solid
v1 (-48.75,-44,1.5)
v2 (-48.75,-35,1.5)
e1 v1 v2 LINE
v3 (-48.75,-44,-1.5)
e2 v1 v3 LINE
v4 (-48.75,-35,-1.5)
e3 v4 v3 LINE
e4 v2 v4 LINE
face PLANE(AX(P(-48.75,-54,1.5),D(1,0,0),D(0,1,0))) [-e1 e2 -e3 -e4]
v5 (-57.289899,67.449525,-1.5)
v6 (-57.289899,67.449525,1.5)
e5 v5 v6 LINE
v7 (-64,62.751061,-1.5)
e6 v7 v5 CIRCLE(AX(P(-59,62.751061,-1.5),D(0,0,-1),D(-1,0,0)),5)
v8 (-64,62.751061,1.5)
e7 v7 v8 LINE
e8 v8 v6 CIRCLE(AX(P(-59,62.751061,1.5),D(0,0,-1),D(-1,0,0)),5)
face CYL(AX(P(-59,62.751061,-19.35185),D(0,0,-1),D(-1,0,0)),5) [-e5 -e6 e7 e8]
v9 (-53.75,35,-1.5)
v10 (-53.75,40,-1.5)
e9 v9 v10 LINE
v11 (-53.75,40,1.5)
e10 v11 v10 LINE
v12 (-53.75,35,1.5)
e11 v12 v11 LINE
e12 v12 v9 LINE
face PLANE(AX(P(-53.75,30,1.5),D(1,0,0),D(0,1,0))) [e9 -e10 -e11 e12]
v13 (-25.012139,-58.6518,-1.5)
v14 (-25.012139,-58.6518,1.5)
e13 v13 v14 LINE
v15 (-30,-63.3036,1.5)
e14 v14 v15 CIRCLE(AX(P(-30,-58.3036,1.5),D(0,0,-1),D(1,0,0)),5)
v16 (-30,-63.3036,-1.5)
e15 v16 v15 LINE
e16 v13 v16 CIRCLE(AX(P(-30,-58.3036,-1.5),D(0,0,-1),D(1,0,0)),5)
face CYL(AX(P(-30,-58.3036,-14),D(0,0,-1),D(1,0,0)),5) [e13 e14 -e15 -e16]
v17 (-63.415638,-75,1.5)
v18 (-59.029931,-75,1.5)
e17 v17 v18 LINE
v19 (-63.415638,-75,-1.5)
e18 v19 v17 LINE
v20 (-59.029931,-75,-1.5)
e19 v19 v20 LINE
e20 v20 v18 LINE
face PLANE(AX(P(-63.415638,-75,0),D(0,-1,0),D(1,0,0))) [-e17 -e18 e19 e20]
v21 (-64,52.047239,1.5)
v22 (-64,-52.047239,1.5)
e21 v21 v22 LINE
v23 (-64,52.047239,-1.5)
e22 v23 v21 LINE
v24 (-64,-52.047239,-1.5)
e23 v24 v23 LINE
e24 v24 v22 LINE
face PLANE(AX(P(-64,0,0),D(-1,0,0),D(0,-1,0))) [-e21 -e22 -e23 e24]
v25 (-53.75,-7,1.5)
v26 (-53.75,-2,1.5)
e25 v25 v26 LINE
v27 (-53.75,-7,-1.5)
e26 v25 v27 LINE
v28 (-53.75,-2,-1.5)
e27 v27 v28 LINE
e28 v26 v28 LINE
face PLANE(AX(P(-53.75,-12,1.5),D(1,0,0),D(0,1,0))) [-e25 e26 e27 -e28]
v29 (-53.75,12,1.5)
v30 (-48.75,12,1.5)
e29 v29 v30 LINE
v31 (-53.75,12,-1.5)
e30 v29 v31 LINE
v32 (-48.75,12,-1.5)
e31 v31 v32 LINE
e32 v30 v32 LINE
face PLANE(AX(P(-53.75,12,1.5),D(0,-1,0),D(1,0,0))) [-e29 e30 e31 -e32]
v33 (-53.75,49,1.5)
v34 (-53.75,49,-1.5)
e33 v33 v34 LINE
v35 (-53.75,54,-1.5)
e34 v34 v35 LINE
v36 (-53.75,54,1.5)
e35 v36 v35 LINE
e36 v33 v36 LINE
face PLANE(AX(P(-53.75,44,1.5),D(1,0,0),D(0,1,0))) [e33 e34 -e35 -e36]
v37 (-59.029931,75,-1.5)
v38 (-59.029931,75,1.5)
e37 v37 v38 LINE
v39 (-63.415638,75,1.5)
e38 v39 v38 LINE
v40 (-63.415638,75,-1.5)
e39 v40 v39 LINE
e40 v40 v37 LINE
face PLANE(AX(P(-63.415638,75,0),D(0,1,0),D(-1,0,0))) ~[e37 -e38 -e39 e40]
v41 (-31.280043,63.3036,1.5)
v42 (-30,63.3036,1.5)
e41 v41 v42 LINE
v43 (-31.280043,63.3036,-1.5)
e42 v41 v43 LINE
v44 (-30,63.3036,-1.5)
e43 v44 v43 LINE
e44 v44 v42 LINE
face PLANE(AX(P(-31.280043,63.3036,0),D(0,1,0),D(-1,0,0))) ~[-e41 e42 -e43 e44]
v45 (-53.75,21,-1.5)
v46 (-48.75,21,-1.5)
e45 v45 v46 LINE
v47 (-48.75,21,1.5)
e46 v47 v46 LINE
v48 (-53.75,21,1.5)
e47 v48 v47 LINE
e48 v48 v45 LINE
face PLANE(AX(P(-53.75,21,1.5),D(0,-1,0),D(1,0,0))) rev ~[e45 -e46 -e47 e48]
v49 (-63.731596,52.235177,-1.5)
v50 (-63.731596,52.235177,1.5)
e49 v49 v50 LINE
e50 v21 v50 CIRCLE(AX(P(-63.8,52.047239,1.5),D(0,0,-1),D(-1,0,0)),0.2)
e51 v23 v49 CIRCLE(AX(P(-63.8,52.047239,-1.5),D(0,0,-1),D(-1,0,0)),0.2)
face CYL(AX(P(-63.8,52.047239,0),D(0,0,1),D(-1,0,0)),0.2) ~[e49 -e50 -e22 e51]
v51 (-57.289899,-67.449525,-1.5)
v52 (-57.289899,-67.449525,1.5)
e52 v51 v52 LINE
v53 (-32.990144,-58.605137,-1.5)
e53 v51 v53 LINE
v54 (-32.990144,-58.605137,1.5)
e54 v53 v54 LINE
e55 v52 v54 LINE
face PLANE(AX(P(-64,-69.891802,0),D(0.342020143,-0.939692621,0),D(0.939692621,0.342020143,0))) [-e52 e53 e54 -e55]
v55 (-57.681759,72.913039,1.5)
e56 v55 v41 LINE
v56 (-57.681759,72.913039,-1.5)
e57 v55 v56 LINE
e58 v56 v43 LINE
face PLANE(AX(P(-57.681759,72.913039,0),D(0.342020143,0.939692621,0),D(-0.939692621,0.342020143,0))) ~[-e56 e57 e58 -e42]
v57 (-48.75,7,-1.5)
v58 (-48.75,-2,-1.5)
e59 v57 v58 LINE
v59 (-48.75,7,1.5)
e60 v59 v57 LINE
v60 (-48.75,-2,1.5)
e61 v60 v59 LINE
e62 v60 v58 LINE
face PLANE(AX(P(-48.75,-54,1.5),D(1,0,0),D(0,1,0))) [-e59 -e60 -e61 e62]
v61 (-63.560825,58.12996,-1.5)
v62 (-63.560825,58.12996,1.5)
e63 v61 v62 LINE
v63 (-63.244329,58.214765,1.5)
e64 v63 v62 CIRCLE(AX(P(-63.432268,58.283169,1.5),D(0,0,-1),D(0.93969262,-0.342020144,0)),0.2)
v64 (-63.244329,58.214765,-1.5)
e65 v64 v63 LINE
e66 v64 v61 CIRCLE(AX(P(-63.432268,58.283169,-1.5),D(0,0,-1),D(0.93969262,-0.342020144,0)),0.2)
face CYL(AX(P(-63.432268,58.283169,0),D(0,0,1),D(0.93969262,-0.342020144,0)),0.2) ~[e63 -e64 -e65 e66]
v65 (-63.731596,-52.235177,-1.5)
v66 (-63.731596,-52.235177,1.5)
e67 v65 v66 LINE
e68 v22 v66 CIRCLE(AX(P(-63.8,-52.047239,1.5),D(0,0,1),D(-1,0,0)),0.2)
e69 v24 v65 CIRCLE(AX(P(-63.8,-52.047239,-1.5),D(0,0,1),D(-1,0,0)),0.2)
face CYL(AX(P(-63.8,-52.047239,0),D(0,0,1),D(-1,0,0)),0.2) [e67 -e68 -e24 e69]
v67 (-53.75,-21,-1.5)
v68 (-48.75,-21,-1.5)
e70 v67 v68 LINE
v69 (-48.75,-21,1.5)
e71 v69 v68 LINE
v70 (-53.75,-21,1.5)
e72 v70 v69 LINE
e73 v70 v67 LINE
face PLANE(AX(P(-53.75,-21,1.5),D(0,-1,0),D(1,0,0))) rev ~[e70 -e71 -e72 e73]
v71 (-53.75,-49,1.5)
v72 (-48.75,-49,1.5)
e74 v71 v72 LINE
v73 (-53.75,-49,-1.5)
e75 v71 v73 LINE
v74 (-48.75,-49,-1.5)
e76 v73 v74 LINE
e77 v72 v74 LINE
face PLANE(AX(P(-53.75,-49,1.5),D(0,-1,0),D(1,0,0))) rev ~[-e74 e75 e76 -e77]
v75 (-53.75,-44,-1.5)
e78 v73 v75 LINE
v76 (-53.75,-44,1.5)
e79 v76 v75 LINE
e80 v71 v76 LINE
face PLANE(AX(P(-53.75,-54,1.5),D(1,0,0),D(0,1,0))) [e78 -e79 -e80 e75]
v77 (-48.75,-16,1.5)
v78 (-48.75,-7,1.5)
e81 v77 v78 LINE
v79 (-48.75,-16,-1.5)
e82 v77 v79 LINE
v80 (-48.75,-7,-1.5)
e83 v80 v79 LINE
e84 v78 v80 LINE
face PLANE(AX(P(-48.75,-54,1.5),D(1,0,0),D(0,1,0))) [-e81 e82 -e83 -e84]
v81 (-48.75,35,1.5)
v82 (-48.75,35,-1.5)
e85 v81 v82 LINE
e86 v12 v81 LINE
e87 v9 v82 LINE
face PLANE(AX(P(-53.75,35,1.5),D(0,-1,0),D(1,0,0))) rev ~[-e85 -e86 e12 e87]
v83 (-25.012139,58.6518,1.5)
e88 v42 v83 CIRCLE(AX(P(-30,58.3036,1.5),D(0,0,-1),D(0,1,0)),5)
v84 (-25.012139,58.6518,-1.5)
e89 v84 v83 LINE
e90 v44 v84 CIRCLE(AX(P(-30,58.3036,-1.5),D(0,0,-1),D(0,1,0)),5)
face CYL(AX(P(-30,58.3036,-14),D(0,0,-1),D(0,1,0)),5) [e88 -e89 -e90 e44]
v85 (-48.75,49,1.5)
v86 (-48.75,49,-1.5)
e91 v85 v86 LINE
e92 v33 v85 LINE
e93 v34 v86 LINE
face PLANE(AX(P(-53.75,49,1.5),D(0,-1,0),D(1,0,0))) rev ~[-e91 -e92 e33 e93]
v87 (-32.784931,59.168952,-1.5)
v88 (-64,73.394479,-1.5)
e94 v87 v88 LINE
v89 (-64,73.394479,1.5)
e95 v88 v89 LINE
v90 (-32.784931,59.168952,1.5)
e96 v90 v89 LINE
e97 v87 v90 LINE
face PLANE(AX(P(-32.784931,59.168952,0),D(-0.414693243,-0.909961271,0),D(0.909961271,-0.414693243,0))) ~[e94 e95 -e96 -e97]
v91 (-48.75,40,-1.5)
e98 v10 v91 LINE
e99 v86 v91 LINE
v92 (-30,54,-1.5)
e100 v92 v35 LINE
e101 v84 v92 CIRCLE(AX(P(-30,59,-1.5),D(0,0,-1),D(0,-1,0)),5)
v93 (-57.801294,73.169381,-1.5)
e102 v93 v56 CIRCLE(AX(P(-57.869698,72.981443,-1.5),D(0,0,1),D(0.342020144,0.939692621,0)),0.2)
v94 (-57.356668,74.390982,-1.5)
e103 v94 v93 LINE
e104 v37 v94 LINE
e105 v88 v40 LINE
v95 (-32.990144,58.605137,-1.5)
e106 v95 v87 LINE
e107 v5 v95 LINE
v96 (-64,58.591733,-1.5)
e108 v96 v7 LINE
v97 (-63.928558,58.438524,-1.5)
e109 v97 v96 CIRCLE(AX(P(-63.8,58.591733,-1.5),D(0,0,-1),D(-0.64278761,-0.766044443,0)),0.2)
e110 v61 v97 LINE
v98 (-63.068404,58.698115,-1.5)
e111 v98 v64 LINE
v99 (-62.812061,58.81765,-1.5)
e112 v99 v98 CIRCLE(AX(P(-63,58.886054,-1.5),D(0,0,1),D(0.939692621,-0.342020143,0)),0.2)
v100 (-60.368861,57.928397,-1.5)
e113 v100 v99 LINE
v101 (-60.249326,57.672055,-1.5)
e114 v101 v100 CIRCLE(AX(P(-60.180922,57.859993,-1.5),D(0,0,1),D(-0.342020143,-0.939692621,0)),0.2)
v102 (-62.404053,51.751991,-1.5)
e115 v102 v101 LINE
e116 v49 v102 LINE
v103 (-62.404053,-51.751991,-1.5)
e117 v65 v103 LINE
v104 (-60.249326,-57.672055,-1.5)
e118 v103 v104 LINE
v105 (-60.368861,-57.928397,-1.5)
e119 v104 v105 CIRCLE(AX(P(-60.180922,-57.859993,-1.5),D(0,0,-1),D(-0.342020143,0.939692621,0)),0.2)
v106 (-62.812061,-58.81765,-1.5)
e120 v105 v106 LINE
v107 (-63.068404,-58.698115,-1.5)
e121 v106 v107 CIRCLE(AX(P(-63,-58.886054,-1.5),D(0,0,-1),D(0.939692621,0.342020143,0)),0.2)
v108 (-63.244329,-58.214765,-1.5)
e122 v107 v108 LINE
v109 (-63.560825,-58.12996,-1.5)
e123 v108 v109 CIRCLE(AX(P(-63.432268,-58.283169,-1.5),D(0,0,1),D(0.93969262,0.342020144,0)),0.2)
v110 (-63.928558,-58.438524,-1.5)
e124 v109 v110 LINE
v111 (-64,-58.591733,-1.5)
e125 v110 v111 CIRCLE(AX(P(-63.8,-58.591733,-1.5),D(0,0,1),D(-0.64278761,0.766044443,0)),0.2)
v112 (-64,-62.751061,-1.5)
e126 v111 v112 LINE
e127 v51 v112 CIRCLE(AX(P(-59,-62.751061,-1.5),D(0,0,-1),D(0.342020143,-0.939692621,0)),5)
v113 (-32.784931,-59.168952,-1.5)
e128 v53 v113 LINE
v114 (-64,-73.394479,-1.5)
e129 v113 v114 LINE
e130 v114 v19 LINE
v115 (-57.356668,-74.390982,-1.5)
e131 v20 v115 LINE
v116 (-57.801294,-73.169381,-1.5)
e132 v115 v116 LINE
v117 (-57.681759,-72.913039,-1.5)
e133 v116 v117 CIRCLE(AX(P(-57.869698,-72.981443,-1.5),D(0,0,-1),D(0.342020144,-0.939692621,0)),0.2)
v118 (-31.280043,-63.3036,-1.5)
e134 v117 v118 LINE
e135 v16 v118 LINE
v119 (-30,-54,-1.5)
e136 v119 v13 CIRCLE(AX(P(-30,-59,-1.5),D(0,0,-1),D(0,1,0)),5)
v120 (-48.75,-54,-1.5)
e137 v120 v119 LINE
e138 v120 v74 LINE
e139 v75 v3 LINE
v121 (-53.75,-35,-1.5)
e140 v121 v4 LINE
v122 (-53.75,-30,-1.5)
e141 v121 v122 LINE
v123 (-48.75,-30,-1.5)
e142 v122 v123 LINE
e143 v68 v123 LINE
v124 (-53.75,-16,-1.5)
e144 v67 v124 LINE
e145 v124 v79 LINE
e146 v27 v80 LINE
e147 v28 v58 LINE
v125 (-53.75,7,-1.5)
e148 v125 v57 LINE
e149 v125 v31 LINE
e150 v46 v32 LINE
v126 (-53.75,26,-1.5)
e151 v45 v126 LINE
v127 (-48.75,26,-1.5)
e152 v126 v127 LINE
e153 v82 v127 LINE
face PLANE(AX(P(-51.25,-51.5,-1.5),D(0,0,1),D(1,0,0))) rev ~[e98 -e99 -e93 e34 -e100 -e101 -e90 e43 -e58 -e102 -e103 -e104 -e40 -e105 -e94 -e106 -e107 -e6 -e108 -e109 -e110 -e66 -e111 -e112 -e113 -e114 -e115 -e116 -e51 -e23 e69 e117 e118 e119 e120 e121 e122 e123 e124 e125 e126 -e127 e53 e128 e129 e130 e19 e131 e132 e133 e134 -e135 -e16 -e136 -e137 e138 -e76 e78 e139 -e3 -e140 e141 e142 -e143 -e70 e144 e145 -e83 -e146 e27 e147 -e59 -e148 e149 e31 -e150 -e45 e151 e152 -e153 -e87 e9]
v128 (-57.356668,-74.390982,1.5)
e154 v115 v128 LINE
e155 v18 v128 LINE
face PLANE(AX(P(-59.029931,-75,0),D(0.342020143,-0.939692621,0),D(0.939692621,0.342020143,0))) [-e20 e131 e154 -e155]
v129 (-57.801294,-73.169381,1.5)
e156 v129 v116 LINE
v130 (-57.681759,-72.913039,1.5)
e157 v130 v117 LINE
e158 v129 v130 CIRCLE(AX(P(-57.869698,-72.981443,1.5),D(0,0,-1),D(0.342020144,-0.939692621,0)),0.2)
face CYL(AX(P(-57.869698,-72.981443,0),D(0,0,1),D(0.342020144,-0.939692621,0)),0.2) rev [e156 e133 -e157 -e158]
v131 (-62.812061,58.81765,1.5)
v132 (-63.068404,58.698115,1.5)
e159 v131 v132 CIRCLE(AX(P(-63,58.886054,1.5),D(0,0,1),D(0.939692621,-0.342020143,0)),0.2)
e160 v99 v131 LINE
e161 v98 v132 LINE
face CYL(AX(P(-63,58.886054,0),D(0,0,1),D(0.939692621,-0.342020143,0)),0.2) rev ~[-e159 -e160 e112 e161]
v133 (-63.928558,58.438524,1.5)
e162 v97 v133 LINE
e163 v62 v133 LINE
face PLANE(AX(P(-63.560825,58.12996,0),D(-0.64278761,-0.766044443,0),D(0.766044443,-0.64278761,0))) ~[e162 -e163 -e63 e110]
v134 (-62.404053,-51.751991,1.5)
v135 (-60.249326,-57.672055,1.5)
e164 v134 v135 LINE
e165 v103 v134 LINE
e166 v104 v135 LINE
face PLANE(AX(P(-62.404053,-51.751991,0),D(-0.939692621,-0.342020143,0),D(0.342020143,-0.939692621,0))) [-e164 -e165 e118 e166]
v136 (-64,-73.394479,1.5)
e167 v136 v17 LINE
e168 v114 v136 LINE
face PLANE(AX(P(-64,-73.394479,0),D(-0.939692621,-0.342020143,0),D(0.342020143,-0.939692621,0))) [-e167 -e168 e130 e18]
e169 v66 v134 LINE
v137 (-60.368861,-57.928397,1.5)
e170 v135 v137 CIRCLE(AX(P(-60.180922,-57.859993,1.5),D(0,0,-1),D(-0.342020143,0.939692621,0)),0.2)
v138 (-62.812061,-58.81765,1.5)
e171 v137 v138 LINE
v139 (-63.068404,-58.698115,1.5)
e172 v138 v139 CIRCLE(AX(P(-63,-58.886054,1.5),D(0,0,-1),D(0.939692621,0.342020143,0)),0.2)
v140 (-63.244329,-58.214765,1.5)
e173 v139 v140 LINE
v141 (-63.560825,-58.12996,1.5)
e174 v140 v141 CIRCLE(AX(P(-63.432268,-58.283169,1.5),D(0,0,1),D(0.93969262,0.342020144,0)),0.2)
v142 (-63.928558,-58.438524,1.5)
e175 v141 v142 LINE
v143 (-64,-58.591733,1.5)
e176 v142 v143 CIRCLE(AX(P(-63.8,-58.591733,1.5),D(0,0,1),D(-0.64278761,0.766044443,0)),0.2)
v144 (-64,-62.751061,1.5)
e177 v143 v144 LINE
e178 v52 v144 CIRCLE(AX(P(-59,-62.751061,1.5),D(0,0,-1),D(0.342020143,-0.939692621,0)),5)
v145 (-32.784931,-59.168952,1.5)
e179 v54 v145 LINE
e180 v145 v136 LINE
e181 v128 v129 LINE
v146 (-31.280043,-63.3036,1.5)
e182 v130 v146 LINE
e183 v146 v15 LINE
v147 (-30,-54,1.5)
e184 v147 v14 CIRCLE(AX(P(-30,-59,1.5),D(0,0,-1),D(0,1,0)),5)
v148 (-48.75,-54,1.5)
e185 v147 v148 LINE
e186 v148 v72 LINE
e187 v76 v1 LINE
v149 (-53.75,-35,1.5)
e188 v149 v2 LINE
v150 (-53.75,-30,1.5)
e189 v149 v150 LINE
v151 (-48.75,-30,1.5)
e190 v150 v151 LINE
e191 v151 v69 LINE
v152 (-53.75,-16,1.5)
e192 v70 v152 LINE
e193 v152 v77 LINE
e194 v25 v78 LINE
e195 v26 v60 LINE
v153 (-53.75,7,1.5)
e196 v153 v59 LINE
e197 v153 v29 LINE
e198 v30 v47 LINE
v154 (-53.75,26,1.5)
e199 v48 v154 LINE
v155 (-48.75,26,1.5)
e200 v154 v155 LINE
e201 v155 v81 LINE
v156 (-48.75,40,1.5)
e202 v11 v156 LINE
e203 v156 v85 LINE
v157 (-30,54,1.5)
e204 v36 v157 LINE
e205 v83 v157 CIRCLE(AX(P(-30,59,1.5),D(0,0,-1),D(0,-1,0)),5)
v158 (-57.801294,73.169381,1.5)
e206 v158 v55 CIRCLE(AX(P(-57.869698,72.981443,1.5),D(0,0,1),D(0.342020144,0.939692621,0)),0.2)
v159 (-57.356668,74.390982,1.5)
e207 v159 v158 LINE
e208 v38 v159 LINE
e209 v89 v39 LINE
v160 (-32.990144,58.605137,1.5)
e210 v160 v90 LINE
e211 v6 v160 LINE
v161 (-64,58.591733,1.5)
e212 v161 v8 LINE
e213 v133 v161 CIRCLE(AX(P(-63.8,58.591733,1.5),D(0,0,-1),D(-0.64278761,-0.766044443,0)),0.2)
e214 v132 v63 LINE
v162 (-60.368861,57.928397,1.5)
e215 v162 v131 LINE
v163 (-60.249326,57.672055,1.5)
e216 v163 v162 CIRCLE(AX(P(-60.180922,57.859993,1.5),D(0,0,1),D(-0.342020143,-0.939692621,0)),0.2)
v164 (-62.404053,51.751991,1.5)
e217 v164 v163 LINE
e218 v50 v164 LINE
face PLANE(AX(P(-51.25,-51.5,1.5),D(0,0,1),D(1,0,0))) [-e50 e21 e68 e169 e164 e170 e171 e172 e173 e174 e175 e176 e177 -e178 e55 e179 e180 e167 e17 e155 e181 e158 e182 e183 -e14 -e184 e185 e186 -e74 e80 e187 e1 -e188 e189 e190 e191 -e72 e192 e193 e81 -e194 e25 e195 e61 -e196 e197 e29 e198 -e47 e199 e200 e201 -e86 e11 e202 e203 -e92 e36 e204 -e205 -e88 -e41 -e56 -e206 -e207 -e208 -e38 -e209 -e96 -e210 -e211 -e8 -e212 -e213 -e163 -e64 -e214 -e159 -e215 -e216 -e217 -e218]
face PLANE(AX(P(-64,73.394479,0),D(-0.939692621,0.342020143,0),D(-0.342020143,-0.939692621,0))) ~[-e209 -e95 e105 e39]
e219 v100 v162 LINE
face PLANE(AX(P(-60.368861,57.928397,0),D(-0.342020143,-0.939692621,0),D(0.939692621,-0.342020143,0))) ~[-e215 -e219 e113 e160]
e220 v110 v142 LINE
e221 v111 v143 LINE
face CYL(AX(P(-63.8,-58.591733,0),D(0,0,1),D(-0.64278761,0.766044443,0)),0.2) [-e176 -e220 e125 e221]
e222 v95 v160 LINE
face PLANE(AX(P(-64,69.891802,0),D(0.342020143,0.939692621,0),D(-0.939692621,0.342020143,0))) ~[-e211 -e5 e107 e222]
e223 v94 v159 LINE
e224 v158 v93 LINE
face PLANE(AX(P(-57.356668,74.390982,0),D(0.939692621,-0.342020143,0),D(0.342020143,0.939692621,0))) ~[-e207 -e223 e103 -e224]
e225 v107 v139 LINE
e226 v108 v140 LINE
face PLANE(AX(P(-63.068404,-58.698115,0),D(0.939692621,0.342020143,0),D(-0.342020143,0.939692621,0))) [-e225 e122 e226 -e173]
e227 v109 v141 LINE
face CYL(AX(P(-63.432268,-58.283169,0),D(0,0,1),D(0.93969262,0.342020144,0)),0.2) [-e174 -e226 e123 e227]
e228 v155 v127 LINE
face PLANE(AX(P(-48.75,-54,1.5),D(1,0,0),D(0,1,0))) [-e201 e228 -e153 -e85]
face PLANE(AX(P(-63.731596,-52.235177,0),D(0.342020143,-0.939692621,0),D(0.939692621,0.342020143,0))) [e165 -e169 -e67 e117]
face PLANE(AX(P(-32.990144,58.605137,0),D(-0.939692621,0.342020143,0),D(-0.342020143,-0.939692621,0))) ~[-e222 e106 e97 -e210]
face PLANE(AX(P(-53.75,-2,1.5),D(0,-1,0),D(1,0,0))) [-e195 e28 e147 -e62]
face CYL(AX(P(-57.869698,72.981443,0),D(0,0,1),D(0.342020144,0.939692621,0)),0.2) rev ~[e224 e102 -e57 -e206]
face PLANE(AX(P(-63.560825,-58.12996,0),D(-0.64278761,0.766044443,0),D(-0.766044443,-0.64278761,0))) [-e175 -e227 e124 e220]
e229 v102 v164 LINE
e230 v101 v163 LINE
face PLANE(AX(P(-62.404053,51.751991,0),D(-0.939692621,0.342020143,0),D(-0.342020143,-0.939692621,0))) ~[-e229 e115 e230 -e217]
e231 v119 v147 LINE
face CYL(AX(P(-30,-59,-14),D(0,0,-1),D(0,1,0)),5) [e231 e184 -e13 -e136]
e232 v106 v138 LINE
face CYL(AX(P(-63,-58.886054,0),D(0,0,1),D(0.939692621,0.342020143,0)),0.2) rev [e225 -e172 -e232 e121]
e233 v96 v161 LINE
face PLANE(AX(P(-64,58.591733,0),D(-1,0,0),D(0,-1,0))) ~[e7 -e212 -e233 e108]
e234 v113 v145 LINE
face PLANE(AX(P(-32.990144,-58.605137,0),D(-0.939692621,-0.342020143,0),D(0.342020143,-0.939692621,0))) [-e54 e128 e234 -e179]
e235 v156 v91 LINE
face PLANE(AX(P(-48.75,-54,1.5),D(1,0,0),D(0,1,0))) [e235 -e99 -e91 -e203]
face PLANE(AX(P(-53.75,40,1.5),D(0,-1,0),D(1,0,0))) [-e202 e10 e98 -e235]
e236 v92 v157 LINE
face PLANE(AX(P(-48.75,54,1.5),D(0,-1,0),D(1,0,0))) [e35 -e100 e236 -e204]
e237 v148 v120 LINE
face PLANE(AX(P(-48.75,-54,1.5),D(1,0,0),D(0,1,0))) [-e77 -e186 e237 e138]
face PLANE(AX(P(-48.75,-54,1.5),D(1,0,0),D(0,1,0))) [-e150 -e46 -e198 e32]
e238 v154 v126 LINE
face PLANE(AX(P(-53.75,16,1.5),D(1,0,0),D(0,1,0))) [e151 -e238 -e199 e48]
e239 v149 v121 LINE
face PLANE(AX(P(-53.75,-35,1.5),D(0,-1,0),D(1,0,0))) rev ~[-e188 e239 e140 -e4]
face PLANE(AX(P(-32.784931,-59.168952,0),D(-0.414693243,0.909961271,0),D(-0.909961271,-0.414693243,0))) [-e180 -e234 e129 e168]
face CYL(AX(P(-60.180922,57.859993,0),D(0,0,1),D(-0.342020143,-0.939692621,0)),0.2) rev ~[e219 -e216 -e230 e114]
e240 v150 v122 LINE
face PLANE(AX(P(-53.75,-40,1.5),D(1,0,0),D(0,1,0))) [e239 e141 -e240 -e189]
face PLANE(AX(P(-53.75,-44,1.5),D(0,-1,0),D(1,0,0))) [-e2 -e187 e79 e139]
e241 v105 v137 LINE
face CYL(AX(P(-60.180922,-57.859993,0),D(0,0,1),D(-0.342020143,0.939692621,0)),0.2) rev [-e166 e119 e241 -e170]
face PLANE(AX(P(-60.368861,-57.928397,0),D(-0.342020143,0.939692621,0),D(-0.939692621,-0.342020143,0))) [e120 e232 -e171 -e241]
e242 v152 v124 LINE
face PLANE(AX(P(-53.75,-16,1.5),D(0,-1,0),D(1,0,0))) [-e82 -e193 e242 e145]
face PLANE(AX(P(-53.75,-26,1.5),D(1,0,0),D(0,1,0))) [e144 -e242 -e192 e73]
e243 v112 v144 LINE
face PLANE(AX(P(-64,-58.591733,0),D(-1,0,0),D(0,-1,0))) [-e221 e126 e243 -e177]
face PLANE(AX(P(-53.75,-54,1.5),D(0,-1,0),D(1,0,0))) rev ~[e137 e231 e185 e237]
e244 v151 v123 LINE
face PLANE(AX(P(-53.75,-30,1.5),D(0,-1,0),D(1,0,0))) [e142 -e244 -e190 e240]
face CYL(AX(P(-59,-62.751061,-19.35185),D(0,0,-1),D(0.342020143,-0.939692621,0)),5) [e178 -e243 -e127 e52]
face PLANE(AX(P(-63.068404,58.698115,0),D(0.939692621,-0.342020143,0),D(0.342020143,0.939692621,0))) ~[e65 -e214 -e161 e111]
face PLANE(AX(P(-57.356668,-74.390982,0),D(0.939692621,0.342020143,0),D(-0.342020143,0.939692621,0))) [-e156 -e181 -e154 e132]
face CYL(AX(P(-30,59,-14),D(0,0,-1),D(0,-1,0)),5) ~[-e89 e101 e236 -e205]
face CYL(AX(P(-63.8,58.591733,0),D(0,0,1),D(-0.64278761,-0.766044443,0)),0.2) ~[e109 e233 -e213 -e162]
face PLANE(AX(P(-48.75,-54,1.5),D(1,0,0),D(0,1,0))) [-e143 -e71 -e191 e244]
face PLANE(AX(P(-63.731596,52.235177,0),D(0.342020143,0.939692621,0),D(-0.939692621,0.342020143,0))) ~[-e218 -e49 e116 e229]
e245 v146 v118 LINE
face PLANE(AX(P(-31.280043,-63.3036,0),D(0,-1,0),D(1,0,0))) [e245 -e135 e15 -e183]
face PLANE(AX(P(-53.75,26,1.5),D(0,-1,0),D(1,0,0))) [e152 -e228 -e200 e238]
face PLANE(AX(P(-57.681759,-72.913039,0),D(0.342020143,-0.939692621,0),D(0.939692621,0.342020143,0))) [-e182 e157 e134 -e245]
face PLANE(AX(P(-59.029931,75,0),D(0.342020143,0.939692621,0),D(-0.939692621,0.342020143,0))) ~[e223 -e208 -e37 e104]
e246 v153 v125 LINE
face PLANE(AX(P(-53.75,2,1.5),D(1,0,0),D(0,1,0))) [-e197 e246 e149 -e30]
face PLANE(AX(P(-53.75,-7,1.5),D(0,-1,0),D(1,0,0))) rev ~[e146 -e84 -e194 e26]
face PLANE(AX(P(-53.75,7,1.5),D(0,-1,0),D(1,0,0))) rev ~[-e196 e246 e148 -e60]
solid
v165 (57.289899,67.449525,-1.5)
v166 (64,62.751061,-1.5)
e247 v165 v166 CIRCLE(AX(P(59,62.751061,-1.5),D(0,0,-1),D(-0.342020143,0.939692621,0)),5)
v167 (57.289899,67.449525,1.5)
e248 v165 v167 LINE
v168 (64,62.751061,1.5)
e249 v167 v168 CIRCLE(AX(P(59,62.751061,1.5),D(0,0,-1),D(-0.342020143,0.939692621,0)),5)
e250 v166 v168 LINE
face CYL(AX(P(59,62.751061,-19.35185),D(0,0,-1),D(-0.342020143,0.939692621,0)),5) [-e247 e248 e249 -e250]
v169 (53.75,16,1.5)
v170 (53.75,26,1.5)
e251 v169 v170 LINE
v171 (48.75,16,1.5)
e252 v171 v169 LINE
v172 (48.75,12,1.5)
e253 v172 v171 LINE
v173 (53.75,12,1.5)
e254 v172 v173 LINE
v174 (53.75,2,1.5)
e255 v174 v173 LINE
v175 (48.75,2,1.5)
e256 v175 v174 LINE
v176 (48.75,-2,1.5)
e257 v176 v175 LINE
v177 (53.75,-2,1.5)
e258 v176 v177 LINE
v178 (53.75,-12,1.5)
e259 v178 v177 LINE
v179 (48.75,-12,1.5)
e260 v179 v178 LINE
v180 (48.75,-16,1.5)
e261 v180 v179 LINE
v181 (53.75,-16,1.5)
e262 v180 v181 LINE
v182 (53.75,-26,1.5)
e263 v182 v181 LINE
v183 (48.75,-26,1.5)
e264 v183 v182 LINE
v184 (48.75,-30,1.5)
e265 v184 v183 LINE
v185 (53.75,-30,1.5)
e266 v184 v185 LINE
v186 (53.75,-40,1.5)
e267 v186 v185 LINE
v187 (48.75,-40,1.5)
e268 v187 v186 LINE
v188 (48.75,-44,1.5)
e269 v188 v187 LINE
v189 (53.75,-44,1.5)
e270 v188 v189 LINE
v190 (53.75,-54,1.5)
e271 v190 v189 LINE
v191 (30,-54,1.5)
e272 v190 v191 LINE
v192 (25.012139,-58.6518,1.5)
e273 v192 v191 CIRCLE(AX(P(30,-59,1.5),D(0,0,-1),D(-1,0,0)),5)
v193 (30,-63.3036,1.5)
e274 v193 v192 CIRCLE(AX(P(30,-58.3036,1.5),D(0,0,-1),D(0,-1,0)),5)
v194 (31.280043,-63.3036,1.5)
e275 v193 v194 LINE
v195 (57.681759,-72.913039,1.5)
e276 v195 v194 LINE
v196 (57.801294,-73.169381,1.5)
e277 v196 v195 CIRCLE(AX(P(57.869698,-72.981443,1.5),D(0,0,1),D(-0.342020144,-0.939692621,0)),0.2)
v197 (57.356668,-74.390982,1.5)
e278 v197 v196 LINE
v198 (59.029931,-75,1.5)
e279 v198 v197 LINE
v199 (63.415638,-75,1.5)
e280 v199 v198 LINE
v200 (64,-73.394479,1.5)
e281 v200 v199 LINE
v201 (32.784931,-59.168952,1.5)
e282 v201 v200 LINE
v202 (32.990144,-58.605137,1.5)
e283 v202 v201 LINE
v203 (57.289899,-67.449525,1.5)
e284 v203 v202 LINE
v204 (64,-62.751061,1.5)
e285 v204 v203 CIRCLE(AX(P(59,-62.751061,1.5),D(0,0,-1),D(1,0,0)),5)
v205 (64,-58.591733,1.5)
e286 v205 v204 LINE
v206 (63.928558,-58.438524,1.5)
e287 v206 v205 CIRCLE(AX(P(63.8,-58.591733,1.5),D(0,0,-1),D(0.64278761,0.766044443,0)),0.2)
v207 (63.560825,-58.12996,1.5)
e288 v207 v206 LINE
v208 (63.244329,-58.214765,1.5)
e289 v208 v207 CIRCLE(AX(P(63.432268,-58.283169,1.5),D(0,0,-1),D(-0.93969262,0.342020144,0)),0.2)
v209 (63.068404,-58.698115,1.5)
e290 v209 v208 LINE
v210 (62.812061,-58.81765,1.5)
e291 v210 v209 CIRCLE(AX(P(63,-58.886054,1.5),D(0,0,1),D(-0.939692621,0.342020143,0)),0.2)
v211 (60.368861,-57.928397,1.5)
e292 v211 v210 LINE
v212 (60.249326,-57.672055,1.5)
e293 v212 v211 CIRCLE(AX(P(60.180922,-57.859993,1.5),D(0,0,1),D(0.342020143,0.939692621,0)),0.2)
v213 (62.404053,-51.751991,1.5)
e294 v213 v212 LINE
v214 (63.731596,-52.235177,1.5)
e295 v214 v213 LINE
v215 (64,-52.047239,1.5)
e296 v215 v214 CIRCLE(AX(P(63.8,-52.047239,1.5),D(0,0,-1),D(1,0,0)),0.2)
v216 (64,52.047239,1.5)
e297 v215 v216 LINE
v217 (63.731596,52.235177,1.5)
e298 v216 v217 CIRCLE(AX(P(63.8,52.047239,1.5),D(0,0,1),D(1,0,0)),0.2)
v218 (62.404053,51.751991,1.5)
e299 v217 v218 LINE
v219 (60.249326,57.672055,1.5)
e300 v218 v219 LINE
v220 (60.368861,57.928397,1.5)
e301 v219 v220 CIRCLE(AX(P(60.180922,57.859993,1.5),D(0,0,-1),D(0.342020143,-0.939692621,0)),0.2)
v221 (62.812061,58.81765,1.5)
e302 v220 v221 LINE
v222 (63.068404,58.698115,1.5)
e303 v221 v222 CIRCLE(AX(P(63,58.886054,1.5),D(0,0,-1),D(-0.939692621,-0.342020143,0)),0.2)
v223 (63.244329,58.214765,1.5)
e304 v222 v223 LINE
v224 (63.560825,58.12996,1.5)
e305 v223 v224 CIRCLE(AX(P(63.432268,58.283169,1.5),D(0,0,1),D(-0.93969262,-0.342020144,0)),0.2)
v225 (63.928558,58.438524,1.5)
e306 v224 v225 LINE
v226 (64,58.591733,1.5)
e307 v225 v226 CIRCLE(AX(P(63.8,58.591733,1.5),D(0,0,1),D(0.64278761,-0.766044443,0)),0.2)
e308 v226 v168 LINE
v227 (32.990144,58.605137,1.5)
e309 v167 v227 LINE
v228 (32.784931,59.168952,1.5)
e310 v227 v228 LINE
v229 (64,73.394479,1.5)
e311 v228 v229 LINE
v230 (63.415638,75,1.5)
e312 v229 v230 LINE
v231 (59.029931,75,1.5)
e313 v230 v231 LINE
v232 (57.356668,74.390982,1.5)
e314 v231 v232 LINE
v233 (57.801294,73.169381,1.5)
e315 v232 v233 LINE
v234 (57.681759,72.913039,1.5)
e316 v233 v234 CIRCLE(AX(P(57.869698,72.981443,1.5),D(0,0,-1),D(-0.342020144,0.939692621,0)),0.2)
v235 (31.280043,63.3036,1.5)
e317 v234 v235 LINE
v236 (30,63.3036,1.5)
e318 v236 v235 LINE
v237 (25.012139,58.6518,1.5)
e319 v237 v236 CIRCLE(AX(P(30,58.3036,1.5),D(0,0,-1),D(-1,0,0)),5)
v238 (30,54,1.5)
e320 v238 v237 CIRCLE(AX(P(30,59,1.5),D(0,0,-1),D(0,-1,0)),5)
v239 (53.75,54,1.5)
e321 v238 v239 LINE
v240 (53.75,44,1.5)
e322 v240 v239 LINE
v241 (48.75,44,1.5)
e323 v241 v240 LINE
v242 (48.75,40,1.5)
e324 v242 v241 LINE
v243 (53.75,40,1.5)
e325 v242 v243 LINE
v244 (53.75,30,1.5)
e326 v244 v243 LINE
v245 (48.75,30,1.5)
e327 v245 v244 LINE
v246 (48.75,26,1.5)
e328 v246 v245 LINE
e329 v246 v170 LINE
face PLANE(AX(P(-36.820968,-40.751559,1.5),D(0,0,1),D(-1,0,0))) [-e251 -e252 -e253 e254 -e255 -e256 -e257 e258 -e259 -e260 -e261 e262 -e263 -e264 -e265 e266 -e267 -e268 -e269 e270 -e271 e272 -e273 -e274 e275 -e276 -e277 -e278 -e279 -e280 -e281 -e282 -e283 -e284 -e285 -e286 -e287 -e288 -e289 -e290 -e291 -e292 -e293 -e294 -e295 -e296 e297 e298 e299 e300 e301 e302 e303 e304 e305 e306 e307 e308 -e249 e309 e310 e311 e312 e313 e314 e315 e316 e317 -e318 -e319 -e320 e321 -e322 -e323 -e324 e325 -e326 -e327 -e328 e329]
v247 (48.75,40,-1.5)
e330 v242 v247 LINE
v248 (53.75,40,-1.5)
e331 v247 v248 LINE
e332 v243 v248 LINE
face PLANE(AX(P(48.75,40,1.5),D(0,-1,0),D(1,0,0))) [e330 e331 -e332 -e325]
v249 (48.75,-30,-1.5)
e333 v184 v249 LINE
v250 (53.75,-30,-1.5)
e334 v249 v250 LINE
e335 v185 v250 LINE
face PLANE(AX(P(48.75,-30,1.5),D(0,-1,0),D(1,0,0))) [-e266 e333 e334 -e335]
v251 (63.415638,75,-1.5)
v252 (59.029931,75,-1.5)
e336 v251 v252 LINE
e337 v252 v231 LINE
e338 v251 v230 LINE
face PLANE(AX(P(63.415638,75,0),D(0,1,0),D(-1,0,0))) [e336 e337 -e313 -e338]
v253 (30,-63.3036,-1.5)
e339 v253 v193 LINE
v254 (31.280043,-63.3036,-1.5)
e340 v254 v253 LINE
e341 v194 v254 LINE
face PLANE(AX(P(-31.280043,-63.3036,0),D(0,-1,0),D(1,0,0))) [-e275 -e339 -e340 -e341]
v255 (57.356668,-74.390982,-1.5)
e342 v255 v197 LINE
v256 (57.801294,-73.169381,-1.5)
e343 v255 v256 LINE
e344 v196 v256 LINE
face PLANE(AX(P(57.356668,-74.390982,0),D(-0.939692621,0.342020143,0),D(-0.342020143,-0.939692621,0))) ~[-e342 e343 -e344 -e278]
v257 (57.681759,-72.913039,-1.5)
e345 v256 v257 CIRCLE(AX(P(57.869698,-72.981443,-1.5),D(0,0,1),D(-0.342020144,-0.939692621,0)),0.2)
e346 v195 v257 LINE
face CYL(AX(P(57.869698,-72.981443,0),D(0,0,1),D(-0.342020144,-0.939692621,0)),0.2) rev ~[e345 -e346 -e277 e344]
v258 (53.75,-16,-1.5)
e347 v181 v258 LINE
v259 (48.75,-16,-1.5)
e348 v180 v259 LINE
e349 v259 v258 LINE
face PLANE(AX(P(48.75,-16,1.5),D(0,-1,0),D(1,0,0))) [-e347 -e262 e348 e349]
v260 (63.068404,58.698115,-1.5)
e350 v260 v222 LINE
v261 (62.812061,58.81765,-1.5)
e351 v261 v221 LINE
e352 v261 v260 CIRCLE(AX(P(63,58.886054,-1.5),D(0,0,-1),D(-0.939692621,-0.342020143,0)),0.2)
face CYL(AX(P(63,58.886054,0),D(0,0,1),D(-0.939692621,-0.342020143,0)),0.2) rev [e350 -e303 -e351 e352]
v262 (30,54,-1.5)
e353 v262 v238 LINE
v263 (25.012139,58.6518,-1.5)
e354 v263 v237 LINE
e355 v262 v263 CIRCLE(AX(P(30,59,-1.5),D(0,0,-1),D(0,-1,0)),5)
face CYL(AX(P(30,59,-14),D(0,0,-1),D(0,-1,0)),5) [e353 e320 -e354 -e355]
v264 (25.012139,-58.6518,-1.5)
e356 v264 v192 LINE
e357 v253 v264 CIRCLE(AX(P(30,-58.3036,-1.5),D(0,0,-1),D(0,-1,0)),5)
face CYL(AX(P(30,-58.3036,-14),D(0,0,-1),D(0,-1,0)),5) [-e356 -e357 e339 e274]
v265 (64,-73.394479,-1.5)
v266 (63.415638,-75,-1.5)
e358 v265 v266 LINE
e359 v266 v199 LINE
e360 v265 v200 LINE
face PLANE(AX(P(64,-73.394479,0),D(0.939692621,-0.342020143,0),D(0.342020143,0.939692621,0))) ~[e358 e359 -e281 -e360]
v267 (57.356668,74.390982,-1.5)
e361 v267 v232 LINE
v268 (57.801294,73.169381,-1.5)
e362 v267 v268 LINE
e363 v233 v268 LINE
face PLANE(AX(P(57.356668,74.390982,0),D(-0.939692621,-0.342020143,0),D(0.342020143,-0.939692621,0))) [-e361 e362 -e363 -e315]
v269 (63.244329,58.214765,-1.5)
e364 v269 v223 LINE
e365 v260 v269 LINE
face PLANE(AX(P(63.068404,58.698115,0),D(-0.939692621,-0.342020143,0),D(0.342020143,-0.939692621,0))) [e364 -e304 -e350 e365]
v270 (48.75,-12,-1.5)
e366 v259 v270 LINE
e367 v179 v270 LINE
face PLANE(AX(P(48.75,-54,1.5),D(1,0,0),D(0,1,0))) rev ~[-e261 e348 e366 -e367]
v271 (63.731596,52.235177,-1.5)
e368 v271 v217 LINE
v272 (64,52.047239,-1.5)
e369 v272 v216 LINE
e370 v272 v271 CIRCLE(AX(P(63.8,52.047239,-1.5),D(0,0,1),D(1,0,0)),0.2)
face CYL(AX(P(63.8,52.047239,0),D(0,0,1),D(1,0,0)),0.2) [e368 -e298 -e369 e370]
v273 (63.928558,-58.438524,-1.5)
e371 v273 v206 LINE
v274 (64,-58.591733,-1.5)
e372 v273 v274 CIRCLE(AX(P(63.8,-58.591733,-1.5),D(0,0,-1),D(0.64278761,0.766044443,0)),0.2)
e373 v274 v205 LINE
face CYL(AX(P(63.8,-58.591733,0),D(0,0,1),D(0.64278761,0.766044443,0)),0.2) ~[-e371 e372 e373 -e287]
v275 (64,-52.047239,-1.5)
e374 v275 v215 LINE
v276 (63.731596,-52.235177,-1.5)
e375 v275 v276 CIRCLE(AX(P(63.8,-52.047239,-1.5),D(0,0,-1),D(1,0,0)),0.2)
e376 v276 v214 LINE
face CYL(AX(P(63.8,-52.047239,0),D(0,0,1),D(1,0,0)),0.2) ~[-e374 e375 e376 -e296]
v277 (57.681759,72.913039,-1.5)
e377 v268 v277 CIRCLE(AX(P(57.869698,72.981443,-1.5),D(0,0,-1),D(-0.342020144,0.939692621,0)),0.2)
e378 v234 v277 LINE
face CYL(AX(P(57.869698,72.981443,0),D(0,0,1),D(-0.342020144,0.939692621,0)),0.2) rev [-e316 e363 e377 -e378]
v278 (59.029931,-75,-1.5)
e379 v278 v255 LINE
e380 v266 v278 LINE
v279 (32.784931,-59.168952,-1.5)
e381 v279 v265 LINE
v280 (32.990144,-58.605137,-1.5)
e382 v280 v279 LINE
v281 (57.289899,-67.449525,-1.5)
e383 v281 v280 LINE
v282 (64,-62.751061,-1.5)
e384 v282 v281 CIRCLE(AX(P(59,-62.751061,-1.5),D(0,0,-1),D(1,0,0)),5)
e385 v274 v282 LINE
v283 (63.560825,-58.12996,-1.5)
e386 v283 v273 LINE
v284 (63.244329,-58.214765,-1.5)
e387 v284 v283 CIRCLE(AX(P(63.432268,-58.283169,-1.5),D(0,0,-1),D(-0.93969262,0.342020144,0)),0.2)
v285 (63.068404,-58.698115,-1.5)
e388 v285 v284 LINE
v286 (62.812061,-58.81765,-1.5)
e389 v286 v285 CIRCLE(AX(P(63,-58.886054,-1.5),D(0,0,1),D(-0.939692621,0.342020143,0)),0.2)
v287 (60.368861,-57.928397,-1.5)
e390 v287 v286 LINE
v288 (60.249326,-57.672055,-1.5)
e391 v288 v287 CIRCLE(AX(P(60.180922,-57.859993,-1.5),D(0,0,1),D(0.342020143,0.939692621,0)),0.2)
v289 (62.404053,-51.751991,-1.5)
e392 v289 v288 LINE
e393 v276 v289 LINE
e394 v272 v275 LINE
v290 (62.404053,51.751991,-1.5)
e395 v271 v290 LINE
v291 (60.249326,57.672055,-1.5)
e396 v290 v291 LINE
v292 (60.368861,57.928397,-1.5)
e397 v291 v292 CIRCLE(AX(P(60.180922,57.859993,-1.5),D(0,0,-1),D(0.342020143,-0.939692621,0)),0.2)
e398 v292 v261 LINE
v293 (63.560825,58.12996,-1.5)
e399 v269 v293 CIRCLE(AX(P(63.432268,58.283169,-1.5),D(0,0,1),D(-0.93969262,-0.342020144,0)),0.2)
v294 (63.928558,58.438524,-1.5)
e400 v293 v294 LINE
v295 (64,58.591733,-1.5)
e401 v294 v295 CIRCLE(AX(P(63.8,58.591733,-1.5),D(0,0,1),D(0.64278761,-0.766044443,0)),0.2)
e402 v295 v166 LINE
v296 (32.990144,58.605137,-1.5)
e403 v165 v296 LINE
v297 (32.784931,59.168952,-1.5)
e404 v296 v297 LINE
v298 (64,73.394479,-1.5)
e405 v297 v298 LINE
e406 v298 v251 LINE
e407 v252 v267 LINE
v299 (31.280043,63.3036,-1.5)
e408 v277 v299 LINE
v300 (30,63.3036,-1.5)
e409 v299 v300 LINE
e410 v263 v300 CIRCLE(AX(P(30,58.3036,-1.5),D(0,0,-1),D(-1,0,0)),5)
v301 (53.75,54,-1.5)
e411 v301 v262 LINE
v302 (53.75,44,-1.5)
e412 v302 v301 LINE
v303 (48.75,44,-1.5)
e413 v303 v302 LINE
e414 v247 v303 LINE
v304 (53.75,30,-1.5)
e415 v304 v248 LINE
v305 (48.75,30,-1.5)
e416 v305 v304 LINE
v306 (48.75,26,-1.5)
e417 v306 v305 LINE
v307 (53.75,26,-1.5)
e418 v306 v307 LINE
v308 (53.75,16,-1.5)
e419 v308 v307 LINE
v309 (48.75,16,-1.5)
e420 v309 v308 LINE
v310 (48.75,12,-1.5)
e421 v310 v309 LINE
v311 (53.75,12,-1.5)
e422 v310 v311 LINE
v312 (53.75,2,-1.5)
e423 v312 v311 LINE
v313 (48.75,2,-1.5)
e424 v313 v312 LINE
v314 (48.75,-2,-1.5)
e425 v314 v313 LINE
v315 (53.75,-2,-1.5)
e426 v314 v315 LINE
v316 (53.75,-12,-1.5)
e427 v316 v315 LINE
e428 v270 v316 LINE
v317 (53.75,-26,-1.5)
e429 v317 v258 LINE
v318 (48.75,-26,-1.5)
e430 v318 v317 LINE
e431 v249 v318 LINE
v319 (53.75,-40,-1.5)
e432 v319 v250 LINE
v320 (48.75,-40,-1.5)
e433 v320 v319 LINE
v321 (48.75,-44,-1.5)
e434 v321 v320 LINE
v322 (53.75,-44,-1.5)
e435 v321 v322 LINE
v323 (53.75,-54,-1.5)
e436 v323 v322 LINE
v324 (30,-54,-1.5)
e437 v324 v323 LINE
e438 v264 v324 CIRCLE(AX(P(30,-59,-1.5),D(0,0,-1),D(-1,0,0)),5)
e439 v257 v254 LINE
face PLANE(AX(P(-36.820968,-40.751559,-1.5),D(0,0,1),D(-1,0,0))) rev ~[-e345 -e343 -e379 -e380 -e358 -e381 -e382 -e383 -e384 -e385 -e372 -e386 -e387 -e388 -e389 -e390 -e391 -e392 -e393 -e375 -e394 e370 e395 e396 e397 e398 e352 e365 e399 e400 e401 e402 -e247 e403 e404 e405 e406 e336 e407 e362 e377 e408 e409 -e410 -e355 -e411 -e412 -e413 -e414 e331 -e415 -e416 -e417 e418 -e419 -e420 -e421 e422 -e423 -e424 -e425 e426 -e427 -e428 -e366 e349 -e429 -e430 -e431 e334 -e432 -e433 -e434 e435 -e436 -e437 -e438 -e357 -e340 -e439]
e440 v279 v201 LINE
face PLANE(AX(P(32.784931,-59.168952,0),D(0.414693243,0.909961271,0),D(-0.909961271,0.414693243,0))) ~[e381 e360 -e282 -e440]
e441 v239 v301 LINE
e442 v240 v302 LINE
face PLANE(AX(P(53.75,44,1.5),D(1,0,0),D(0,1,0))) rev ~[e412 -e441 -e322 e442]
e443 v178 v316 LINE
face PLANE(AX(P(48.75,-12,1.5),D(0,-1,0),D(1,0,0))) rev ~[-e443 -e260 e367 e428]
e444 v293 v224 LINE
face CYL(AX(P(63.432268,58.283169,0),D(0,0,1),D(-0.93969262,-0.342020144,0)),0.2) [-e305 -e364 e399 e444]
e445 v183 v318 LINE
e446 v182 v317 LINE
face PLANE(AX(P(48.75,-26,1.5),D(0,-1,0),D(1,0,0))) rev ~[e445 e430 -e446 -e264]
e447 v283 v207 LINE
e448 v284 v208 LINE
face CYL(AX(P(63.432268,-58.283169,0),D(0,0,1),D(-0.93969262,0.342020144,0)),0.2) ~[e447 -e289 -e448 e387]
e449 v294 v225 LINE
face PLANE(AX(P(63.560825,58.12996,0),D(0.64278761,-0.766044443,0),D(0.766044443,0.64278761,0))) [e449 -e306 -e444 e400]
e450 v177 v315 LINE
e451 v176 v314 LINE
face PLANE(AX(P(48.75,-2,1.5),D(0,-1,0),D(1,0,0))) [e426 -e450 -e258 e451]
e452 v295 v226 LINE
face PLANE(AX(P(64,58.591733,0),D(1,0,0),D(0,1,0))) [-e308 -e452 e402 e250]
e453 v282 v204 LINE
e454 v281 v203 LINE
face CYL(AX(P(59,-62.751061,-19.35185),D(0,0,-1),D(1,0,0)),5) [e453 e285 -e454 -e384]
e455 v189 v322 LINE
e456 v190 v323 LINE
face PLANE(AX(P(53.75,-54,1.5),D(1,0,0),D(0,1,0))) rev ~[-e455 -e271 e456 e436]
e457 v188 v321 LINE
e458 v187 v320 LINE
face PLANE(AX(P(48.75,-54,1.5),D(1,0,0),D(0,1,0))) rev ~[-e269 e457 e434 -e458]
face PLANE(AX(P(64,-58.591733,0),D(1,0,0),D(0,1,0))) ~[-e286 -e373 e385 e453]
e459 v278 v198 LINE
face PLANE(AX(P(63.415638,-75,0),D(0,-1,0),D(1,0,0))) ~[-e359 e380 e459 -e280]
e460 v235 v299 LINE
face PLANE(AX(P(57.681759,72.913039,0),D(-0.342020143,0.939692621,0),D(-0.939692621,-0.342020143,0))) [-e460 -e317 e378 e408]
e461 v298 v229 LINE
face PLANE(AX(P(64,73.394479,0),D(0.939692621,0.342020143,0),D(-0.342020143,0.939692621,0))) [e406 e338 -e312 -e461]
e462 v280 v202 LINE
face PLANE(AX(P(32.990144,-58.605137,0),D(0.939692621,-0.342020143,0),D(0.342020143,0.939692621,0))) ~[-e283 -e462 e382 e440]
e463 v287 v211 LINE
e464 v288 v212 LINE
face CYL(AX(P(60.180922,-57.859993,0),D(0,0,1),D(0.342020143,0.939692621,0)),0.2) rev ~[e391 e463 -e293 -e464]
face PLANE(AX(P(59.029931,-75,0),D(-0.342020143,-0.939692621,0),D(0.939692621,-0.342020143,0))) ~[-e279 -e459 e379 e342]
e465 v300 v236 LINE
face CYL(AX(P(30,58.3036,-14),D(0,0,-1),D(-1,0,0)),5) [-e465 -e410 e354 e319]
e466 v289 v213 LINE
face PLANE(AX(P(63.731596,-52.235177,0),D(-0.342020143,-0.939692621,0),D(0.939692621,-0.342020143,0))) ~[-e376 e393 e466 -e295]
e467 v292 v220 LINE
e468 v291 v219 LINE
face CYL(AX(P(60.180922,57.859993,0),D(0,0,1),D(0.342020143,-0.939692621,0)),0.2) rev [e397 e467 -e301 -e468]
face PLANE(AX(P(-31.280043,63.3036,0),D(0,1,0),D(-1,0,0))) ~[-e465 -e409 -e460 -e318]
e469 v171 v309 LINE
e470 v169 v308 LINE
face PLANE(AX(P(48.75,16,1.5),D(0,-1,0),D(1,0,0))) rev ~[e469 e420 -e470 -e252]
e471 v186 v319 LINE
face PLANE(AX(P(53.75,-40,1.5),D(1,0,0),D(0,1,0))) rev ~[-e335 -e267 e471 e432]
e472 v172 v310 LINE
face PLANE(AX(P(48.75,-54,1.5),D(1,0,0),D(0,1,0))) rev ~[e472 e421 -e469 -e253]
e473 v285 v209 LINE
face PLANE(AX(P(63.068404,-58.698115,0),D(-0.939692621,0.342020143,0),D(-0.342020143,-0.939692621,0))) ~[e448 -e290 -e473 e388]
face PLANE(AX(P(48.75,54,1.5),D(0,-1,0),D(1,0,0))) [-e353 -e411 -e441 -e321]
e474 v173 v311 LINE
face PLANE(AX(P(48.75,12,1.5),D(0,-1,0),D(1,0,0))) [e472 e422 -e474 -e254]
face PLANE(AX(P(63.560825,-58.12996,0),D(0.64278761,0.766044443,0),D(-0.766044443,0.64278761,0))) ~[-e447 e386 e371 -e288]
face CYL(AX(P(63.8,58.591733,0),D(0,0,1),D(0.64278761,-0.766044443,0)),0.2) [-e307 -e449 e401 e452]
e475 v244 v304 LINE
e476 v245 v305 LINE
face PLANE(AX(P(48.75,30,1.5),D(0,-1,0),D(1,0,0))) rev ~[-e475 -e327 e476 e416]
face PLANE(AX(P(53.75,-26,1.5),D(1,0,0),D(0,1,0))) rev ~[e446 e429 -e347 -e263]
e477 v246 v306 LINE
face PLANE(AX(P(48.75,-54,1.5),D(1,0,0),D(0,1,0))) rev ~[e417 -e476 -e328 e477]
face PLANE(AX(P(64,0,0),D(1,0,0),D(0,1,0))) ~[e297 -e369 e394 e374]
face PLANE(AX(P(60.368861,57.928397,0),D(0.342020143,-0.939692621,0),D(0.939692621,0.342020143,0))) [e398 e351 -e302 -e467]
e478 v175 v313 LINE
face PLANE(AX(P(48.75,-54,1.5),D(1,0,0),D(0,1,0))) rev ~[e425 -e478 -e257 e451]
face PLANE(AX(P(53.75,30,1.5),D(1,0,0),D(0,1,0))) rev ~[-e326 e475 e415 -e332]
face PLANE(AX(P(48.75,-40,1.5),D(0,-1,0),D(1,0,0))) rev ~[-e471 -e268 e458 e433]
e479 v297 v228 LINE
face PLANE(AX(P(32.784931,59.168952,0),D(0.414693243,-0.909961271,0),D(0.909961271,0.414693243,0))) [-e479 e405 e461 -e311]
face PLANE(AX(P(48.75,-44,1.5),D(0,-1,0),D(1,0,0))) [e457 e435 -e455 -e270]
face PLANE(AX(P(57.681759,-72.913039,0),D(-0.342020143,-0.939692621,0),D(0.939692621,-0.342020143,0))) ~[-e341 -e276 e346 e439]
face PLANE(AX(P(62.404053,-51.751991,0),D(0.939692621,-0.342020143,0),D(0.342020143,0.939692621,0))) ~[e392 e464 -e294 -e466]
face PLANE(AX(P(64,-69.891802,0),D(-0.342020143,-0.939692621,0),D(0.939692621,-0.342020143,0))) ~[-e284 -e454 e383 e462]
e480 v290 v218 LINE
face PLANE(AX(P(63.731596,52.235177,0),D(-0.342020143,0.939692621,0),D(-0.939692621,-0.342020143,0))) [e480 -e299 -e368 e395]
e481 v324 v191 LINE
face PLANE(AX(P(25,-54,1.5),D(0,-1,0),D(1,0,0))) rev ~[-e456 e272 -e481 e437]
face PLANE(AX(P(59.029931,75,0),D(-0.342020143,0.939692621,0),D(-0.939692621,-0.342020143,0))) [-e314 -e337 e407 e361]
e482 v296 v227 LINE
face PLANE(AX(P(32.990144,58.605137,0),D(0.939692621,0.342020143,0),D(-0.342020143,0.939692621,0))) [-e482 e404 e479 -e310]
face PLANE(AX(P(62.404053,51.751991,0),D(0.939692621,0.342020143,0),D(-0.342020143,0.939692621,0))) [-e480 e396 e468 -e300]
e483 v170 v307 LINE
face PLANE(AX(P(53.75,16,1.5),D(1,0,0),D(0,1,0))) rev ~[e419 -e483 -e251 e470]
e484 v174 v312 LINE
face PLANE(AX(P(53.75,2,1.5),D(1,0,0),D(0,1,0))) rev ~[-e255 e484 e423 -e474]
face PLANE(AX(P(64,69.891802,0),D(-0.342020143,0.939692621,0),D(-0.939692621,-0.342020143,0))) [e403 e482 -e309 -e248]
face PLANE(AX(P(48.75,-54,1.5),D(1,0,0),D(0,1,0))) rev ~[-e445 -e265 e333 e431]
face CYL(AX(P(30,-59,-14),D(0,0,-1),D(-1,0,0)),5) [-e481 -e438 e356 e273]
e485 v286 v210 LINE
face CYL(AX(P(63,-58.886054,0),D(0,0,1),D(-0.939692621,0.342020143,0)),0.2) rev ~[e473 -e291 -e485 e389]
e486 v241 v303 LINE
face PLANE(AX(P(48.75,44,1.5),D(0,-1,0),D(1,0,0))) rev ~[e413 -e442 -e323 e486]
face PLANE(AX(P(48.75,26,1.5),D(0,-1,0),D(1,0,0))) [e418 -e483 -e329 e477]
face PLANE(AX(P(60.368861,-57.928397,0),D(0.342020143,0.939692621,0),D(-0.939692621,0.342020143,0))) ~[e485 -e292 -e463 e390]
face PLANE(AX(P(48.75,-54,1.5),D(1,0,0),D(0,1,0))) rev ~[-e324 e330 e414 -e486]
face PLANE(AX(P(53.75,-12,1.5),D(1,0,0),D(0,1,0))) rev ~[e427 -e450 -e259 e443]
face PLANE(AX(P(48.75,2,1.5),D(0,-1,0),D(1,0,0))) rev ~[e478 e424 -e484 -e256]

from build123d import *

# Parameters (mm, degrees)
F1_DEPTH        = 1.5
F4_W            = 5
F4_H            = 10
F5_DEPTH        = 3
F6_W            = 23.75
F6_H            = 108
F6_W_2          = 50
F6_H_2          = 26
F7_DEPTH        = 3
F8_W            = 5
F8_H            = 5
F9_DEPTH        = 3
F10_T1_DEPTH    = 38.7037001686
F10_T3_DEPTH    = 28
F10_S1_T1_DEPTH = 38.7037001686
F10_S1_T3_DEPTH = 28


# Not quite as in the source:
# - a fillet or chamfer that OpenCascade refuses, or shapes differently, is made with other operations: its cross-section is extruded or revolved along the edge and cut away or added
# - a feature names something its author has since deleted; it is built from what else it names


with BuildPart() as f1:
    # F0 (on Top) → F1 (new body, symmetric)
    with BuildSketch(Plane.XY):
        with BuildLine():
            Line((31.2800427974, 63.3035998776), (0, 63.3035998776))
            Line((0, 63.3035998776), (0, 0))
            Line((0, 0), (64, 0))
            Line((64, 0), (64, 52.0472386562))
            ThreePointArc((64, 52.0472386562), (63.9147152873, 52.211069065), (63.7315959713, 52.2351771803))
            Line((63.7315959713, 52.2351771803), (62.4040530693, 51.7519910793))
            Line((62.4040530693, 51.7519910793), (60.2493261663, 57.6720545902))
            ThreePointArc((60.2493261663, 57.6720545902), (59.9996605802, 57.9445167667), (60.3688606618, 57.9283971431))
            Line((60.3688606618, 57.9283971431), (62.8120614758, 58.8176495157))
            ThreePointArc((62.8120614758, 58.8176495157), (63.0845236523, 59.0673151018), (63.0684040287, 58.6981150202))
            Line((63.0684040287, 58.6981150202), (63.2443290661, 58.2147649522))
            ThreePointArc((63.2443290661, 58.2147649522), (63.3805037813, 58.0899838157), (63.5608251122, 58.1299600923))
            Line((63.5608251122, 58.1299600923), (63.9285575219, 58.4385242216))
            ThreePointArc((63.9285575219, 58.4385242216), (63.9812615574, 58.5072094579), (64, 58.5917331103))
            Line((64, 58.5917331103), (64, 69.8918015034))
            Line((64, 69.8918015034), (32.9901435141, 58.6051367736))
            Line((32.9901435141, 58.6051367736), (32.7849314281, 59.1689523461))
            Line((32.7849314281, 59.1689523461), (64, 73.3944786626))
            Line((64, 73.3944786626), (63.4156380227, 75))
            Line((63.4156380227, 75), (59.0299314225, 75))
            Line((59.0299314225, 75), (57.3566676351, 74.3909817873))
            Line((57.3566676351, 74.3909817873), (57.8012938214, 73.1693813803))
            ThreePointArc((57.8012938214, 73.1693813803), (58.0509594075, 72.8969192038), (57.681759326, 72.9130388275))
            Line((57.681759326, 72.9130388275), (31.2800427974, 63.3035998776))
        make_face()
    extrude(amount=F1_DEPTH, both=True)

    # F2: F1 across face


with BuildPart() as f1_1:
    add(f1.part)
    add(f1.part.mirror(Plane(origin=(0, 31.6517999388, 0), x_dir=(0, -1, 0), z_dir=(-1, 0, 0))))

    # F3: F1 across face


with BuildPart() as f1_2:
    add(f1_1.part)
    add(f1_1.part.mirror(Plane.XZ))

    # F4 (on face) → F5 (cut)
    with BuildSketch(Plane.XY.offset(1.5)):
        with Locations((-51.25, -49)):
            Rectangle(F4_W, F4_H)
        with Locations((-51.25, -35)):
            Rectangle(F4_W, F4_H)
        with Locations((-51.25, -21)):
            Rectangle(F4_W, F4_H)
        with Locations((-51.25, -7)):
            Rectangle(F4_W, F4_H)
        with Locations((-51.25, 7)):
            Rectangle(F4_W, F4_H)
        with Locations((-51.25, 21)):
            Rectangle(F4_W, F4_H)
        with Locations((-51.25, 35)):
            Rectangle(F4_W, F4_H)
        with Locations((51.25, -49)):
            Rectangle(F4_W, F4_H)
        with Locations((51.25, -35)):
            Rectangle(F4_W, F4_H)
        with Locations((51.25, -21)):
            Rectangle(F4_W, F4_H)
        with Locations((51.25, -7)):
            Rectangle(F4_W, F4_H)
        with Locations((51.25, 7)):
            Rectangle(F4_W, F4_H)
        with Locations((51.25, 21)):
            Rectangle(F4_W, F4_H)
        with Locations((51.25, 35)):
            Rectangle(F4_W, F4_H)
        with Locations((-51.25, 49)):
            Rectangle(F4_W, F4_H)
        with Locations((51.25, 49)):
            Rectangle(F4_W, F4_H)
    extrude(amount=-F5_DEPTH, mode=Mode.SUBTRACT)

    # F6 (on face) → F7 (cut)
    with BuildSketch(Plane.XY.offset(1.5)):
        with Locations((36.875, 0)):
            Rectangle(F6_W, F6_H)
        Rectangle(F6_W_2, F6_H)
        with Locations((0, 67)):
            Rectangle(F6_W_2, F6_H_2)
        with Locations((-36.875, 0)):
            Rectangle(F6_W, F6_H)
        with Locations((0, -67)):
            Rectangle(F6_W_2, F6_H_2)
    extrude(amount=-F7_DEPTH, mode=Mode.SUBTRACT)

    # F8 (on face) → F9 (join, through all)
    with BuildSketch(Plane.XY.offset(1.5)):
        with Locations((-51.25, -51.5)):
            Rectangle(F8_W, F8_H)
        with Locations((-51.25, -37.5)):
            Rectangle(F8_W, F8_H)
        with Locations((-51.25, -23.5)):
            Rectangle(F8_W, F8_H)
        with Locations((-51.25, -9.5)):
            Rectangle(F8_W, F8_H)
        with Locations((-51.25, 4.5)):
            Rectangle(F8_W, F8_H)
        with Locations((-51.25, 18.5)):
            Rectangle(F8_W, F8_H)
        with Locations((-51.25, 32.5)):
            Rectangle(F8_W, F8_H)
        with Locations((-51.25, 46.5)):
            Rectangle(F8_W, F8_H)
    extrude(amount=-F9_DEPTH)

    # F10: fillet of radius 5 on 6 edges, made by hand

    # F10_s2 → F10_t1 (cut)
    with BuildSketch(Plane.XY.offset(-19.3518500843)):
        with BuildLine():
            ThreePointArc((-64, 62.7510614697), (-61.8678821818, 66.8468216911), (-57.2898992834, 67.4495245736))
            Line((-57.2898992834, 67.4495245736), (-64, 69.8918015034))
            Line((-64, 69.8918015034), (-64, 62.7510614697))
        make_face()
        with BuildLine():
            ThreePointArc((-57.2898992834, -67.4495245736), (-61.8678821818, -66.8468216911), (-64, -62.7510614697))
            Line((-64, -62.7510614697), (-64, -69.8918015034))
            Line((-64, -69.8918015034), (-57.2898992834, -67.4495245736))
        make_face()
    extrude(amount=F10_T1_DEPTH, mode=Mode.SUBTRACT)

    # F10_s4 → F10_t3 (cut)
    with BuildSketch(Plane.XY.offset(-14)):
        with BuildLine():
            ThreePointArc((-30, 63.3035998776), (-26.4644660941, 61.8391337835), (-25, 58.3035998776))
            Line((-25, 58.3035998776), (-25, 63.3035998776))
            Line((-25, 63.3035998776), (-30, 63.3035998776))
        make_face()
        with BuildLine():
            ThreePointArc((-30, -54), (-26.4644660941, -55.4644660941), (-25, -59))
            Line((-25, -59), (-25, -54))
            Line((-25, -54), (-30, -54))
        make_face()
        with BuildLine():
            ThreePointArc((-30, 54), (-26.4644660941, 55.4644660941), (-25, 59))
            Line((-25, 59), (-25, 54))
            Line((-25, 54), (-30, 54))
        make_face()
        with BuildLine():
            ThreePointArc((-25, -58.3035998776), (-26.4644660941, -61.8391337835), (-30, -63.3035998776))
            Line((-30, -63.3035998776), (-25, -63.3035998776))
            Line((-25, -63.3035998776), (-25, -58.3035998776))
        make_face()
    extrude(amount=F10_T3_DEPTH, mode=Mode.SUBTRACT)

    # F10#s1: fillet of radius 5 on 6 edges, made by hand

    # F10_s1_s2 → F10_s1_t1 (cut)
    with BuildSketch(Plane.XY.offset(-19.3518500843)):
        with BuildLine():
            ThreePointArc((57.2898992834, 67.4495245736), (61.8678821818, 66.8468216911), (64, 62.7510614697))
            Line((64, 62.7510614697), (64, 69.8918015034))
            Line((64, 69.8918015034), (57.2898992834, 67.4495245736))
        make_face()
        with BuildLine():
            ThreePointArc((64, -62.7510614697), (61.8678821818, -66.8468216911), (57.2898992834, -67.4495245736))
            Line((57.2898992834, -67.4495245736), (64, -69.8918015034))
            Line((64, -69.8918015034), (64, -62.7510614697))
        make_face()
    extrude(amount=F10_S1_T1_DEPTH, mode=Mode.SUBTRACT)

    # F10_s1_s4 → F10_s1_t3 (cut)
    with BuildSketch(Plane.XY.offset(-14)):
        with BuildLine():
            ThreePointArc((25, 58.3035998776), (26.4644660941, 61.8391337835), (30, 63.3035998776))
            Line((30, 63.3035998776), (25, 63.3035998776))
            Line((25, 63.3035998776), (25, 58.3035998776))
        make_face()
        with BuildLine():
            ThreePointArc((30, 54), (26.4644660941, 55.4644660941), (25, 59))
            Line((25, 59), (25, 54))
            Line((25, 54), (30, 54))
        make_face()
        with BuildLine():
            ThreePointArc((25, -59), (26.4644660941, -55.4644660941), (30, -54))
            Line((30, -54), (25, -54))
            Line((25, -54), (25, -59))
        make_face()
        with BuildLine():
            ThreePointArc((30, -63.3035998776), (26.4644660941, -61.8391337835), (25, -58.3035998776))
            Line((25, -58.3035998776), (25, -63.3035998776))
            Line((25, -63.3035998776), (30, -63.3035998776))
        make_face()
    extrude(amount=F10_S1_T3_DEPTH, mode=Mode.SUBTRACT)


solid = f1_2.part
